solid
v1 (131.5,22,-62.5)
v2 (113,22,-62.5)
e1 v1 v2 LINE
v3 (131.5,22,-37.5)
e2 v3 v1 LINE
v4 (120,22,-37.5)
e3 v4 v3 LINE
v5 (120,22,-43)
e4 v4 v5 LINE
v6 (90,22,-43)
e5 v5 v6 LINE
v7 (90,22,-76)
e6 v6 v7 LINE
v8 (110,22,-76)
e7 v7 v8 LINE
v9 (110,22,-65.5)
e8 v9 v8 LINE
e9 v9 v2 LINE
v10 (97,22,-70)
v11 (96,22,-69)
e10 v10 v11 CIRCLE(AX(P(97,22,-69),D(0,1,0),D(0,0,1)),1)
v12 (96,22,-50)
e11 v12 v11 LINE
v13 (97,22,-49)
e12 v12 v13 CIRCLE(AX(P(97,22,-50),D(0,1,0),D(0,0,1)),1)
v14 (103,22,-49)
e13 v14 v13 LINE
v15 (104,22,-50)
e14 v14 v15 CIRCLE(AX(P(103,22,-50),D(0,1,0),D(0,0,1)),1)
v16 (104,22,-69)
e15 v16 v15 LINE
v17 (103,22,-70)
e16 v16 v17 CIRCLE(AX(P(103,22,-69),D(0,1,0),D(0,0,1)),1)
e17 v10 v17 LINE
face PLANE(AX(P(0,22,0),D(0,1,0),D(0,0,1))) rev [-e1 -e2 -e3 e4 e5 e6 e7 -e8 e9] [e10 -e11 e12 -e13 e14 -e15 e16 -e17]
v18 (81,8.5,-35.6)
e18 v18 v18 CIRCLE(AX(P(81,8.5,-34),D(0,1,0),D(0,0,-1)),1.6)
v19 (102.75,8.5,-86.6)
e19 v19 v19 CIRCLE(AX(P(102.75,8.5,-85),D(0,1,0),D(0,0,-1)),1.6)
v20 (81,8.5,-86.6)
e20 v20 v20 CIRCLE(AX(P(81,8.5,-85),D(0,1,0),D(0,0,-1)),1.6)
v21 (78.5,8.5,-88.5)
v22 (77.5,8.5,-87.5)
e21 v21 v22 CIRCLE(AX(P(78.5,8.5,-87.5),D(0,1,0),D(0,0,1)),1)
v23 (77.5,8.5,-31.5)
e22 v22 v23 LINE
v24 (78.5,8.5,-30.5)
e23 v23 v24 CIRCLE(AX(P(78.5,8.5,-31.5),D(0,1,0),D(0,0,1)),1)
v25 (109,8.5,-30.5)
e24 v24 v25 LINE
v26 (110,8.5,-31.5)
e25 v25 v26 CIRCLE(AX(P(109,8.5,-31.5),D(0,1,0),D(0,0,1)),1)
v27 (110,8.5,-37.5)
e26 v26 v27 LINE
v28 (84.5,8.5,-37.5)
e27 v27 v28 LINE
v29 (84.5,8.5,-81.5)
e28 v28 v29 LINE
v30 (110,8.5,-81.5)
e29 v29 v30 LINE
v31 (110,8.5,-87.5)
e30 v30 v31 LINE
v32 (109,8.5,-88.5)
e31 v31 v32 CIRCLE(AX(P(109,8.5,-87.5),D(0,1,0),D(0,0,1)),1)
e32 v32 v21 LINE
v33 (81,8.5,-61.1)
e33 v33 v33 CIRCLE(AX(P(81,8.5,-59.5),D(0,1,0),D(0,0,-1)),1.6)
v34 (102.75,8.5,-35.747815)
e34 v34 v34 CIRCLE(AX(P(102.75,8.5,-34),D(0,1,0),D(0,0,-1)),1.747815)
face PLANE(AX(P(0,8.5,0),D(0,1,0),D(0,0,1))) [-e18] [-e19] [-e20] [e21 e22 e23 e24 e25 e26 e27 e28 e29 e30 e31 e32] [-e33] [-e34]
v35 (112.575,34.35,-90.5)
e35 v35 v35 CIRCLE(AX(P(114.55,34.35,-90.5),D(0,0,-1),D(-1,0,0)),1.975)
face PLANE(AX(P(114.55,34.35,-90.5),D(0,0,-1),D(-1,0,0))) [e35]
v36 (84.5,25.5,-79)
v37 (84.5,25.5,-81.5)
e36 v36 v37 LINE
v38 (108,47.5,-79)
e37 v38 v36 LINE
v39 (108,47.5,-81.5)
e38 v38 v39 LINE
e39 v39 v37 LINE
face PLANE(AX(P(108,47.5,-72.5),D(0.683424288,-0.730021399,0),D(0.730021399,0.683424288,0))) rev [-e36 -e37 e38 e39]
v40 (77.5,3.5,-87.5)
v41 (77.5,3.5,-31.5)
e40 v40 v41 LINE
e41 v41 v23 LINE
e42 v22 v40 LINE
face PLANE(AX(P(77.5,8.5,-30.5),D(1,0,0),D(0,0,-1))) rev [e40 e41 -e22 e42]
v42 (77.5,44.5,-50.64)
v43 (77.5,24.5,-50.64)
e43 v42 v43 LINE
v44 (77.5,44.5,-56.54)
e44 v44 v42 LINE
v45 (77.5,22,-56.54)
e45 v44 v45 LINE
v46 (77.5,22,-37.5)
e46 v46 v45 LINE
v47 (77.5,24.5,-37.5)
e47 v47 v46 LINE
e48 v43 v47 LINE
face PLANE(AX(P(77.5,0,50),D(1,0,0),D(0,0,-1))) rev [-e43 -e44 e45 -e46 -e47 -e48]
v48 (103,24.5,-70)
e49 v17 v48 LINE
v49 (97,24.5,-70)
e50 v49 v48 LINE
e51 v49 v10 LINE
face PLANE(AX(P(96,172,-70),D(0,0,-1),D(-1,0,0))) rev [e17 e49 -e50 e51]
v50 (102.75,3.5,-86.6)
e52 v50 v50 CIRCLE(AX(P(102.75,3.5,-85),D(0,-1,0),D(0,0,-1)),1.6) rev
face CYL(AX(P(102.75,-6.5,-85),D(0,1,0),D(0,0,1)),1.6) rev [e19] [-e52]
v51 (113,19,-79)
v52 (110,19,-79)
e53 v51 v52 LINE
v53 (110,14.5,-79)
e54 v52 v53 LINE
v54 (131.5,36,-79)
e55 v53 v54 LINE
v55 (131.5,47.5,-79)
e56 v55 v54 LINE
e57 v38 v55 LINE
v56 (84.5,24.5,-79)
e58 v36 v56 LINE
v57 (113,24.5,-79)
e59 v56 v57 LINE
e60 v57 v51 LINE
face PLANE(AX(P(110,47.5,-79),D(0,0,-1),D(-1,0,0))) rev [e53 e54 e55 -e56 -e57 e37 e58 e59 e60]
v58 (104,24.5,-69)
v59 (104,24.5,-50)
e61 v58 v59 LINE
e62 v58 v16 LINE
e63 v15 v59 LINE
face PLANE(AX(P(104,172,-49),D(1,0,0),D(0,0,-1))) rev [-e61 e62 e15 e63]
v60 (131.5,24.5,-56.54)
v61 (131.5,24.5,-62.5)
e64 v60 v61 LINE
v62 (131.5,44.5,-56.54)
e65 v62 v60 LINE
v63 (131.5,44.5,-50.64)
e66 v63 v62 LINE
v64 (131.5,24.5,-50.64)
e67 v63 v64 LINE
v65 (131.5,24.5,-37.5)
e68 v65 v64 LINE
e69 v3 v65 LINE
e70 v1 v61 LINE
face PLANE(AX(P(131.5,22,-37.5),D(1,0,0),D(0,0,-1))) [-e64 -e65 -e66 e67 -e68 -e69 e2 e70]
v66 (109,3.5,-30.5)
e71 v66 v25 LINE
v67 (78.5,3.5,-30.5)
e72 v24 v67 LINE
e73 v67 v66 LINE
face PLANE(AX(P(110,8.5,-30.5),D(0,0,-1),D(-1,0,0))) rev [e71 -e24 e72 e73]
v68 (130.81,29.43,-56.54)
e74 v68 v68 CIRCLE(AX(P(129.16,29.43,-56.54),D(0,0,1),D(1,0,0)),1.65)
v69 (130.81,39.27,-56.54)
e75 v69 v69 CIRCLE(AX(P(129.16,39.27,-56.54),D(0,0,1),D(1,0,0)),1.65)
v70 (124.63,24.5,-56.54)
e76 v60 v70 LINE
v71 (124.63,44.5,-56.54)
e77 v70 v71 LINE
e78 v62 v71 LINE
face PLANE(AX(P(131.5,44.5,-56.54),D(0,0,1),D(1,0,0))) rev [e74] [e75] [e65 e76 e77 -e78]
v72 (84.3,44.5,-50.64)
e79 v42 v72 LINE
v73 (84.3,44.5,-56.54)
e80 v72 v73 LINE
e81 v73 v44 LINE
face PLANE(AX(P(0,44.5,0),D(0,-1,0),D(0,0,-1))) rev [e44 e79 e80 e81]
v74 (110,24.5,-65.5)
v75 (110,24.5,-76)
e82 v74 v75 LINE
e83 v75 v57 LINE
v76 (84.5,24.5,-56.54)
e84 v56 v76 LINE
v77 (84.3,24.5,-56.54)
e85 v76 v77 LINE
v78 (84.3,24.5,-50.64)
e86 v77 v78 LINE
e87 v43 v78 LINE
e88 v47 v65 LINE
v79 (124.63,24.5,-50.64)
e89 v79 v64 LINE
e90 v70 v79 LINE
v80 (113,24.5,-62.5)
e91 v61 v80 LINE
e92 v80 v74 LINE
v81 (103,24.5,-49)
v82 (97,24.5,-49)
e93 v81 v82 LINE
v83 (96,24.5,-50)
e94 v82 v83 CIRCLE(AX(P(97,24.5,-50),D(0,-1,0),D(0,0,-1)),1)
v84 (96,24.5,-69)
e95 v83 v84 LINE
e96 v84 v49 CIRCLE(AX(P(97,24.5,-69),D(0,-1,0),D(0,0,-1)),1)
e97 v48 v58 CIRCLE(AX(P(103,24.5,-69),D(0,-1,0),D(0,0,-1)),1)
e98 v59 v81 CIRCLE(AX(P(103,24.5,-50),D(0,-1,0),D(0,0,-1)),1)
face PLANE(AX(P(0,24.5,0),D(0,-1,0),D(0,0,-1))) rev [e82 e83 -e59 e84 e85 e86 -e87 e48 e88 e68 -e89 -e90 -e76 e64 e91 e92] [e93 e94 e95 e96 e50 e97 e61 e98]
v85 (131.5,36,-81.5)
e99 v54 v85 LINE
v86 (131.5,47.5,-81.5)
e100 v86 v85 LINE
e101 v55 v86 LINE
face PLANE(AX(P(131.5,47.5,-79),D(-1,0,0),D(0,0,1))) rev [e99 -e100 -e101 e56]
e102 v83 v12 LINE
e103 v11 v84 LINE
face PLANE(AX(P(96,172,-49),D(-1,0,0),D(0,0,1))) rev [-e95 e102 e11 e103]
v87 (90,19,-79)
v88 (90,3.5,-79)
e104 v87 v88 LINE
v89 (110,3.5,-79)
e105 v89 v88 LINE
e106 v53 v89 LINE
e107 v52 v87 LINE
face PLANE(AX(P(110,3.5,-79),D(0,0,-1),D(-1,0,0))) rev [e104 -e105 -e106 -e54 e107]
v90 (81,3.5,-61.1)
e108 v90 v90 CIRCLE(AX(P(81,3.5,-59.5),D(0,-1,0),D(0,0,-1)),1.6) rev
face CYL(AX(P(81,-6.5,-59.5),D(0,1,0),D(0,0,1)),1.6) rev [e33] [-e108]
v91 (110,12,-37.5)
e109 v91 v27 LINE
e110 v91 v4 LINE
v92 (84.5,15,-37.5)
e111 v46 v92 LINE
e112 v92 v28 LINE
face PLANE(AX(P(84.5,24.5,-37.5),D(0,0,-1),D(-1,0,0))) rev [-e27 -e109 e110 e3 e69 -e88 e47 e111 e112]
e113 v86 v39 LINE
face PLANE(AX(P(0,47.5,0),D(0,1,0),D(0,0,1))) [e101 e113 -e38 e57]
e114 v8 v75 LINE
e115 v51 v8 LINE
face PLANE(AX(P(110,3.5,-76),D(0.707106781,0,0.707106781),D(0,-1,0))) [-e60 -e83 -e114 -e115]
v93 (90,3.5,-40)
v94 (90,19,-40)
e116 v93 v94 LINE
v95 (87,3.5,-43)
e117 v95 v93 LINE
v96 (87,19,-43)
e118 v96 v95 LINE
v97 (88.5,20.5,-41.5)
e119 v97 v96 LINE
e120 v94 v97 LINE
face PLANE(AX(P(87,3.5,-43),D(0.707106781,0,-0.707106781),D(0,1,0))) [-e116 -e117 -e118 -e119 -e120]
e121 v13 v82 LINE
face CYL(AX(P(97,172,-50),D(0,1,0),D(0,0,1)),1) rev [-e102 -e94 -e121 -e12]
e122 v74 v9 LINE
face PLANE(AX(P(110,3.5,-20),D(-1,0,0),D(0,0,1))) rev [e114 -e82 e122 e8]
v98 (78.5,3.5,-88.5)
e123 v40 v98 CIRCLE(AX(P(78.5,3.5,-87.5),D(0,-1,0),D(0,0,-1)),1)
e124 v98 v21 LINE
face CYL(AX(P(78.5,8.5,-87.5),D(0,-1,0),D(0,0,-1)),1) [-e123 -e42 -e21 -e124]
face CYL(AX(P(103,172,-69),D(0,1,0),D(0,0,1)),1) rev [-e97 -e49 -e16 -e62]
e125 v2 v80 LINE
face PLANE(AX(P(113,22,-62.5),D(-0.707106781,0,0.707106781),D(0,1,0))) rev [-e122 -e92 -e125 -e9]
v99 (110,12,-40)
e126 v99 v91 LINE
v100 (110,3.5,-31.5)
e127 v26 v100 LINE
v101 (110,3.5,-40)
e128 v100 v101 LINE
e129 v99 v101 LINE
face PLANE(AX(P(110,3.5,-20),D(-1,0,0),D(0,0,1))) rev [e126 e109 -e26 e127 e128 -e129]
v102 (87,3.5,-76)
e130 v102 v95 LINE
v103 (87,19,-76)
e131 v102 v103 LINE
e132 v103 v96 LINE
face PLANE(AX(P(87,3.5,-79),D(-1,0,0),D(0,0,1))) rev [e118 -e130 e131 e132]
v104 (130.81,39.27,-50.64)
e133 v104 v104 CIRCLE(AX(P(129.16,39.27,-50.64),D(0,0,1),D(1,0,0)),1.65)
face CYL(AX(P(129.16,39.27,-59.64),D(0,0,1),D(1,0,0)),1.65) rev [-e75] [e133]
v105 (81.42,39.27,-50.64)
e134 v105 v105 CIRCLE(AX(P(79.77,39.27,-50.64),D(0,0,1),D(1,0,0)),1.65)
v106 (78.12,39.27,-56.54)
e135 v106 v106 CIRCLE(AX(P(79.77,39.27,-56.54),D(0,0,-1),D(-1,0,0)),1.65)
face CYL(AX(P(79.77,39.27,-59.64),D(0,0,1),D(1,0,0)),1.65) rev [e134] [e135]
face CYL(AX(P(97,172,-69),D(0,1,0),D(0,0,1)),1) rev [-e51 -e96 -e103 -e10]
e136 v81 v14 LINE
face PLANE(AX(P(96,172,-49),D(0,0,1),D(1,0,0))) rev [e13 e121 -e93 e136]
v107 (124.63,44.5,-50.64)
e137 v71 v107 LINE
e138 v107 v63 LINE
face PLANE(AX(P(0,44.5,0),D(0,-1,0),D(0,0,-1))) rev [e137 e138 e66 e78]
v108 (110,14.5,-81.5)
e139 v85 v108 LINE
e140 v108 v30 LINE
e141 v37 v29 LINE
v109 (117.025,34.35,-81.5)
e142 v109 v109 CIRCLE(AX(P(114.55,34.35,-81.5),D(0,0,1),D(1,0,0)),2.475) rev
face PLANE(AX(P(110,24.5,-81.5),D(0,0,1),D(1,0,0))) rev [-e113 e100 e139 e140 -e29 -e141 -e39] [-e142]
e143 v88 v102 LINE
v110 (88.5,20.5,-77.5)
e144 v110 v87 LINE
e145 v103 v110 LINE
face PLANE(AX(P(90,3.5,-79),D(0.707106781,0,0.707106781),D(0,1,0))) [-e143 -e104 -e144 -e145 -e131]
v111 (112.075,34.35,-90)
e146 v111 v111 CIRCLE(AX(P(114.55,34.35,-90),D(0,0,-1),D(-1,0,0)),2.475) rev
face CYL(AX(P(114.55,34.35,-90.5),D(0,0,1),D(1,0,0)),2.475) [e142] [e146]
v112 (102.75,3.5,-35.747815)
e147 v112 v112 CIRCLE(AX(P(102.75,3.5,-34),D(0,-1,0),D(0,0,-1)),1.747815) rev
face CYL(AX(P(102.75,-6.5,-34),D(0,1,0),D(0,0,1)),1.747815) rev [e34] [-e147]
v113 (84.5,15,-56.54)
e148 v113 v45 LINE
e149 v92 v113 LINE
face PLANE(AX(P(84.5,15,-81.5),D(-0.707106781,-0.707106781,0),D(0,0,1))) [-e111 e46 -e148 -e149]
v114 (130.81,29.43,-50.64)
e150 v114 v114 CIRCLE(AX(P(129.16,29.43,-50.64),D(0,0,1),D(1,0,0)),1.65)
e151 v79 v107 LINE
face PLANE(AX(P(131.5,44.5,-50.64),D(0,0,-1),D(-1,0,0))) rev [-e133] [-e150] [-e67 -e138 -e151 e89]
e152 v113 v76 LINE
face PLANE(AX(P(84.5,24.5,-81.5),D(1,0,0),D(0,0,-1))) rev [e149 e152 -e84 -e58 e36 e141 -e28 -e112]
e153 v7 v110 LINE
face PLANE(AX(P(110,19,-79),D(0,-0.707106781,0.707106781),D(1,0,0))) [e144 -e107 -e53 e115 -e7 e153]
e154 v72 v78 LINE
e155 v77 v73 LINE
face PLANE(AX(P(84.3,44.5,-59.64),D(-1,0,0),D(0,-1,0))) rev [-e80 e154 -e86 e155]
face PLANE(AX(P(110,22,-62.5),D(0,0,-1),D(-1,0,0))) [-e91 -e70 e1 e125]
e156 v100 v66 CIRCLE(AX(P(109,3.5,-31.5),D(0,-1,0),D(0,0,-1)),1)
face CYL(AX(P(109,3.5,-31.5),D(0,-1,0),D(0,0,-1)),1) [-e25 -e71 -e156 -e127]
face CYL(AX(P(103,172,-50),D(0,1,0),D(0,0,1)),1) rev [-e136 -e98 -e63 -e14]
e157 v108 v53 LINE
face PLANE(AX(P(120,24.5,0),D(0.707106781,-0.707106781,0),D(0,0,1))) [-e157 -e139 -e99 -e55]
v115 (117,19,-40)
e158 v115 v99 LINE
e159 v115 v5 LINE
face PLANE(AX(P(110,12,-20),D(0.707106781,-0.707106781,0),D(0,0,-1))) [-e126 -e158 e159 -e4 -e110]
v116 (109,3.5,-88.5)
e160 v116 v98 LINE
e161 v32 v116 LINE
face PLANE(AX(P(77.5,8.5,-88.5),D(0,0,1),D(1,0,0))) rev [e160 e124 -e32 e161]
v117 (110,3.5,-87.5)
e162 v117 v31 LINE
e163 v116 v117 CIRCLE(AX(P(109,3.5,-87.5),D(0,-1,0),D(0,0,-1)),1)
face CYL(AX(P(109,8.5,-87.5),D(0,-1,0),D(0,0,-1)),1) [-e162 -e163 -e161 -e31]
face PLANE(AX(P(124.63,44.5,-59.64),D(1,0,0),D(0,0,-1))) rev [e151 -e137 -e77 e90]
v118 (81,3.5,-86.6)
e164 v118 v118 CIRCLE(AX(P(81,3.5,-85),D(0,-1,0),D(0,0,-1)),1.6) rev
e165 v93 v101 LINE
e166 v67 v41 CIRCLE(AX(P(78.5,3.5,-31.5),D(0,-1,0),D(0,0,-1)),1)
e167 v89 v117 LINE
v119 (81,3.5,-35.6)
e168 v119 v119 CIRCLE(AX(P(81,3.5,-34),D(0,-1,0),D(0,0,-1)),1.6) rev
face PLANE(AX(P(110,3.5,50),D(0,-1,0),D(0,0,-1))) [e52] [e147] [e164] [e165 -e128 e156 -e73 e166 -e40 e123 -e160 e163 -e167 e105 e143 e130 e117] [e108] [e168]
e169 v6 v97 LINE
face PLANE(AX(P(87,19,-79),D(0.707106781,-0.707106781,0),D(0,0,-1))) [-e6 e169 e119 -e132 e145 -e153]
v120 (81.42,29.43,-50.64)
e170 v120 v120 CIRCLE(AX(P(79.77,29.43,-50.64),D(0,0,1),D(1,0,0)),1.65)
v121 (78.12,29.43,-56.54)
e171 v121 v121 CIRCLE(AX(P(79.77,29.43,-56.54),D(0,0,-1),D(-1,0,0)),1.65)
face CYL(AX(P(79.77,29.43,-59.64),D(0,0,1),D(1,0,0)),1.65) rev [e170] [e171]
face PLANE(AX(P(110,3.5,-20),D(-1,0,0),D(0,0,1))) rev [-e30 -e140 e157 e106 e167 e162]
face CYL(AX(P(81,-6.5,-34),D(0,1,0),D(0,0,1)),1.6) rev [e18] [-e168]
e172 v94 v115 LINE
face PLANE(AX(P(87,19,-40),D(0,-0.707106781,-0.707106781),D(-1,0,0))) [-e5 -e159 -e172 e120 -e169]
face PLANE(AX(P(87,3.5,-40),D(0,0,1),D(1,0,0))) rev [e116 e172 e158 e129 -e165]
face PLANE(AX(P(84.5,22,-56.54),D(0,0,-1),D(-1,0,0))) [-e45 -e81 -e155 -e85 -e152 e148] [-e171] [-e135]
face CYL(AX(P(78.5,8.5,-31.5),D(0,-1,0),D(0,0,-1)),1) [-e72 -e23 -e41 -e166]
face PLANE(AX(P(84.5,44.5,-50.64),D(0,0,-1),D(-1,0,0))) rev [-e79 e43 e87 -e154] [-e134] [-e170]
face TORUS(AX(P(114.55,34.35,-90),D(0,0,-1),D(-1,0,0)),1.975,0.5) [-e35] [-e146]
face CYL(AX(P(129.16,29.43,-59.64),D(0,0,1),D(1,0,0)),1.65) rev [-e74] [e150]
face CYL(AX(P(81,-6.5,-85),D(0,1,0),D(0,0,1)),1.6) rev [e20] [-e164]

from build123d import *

# Parameters (mm, degrees)
BOSS_EXTRUDE1_DEPTH = 3.5
BOSS_EXTRUDE2_DEPTH = 21
SKETCH3_W           = 23
SKETCH3_H           = 39
BOSS_EXTRUDE3_DEPTH = 2.5
SKETCH5_W           = 21.5
SKETCH5_H           = 25
SKETCH5_W_2         = 7.07
SKETCH5_H_2         = 19.04
BOSS_EXTRUDE5_DEPTH = 2.5
SKETCH6_W           = 7.07
SKETCH6_H           = 5.9
BOSS_EXTRUDE6_DEPTH = 20
BOSS_EXTRUDE7_DEPTH = 23
FILLET1_SIZE        = 10
SKETCH9_R           = 2.475
BOSS_EXTRUDE8_DEPTH = 9
FILLET2_R           = 0.5
SKETCH10_R          = 1.65
CUT_EXTRUDE1_DEPTH  = 9
SKETCH11_W          = 0.2
SKETCH11_H          = 20
CUT_EXTRUDE2_DEPTH  = 9
CUT_EXTRUDE3_DEPTH  = 9
FILLET3_SIZE        = 3
BOSS_EXTRUDE9_DEPTH = 5
SKETCH14_R          = 1.747814763
SKETCH14_R_2        = 1.6
CUT_EXTRUDE4_DEPTH  = 15
SKETCH15_W          = 110
SKETCH15_H          = 3.5
CUT_EXTRUDE5_DEPTH  = 150
FILLET4_SIZE        = 7
FILLET5_SIZE        = 3
FILLET6_SIZE        = 3
SKETCH17_W          = 8
SKETCH17_H          = 21
CUT_EXTRUDE6_DEPTH  = 150
FILLET7_R           = 1
FILLET8_R           = 1
FILLET9_SIZE        = 3


# Some blends are built 0.0001 mm under size
with BuildPart() as part:
    # Sketch1 → Boss-Extrude1 (new body)
    with BuildSketch(Plane(origin=(0, 0, 0), x_dir=(1, 0, 0), z_dir=(0, 1, 0))):
        Polygon((0, 40), (23, 40), (23, 79), (0, 79), (0, 100), (110, 100), (110, 79), (87, 79), (87, 40), (110, 40), (110, 20), (80, 0), (30, 0), (0, 20), align=None)
    extrude(amount=BOSS_EXTRUDE1_DEPTH)

    # Sketch2 → Boss-Extrude2 (add)
    with BuildSketch(Plane(origin=(0, 3.5, 0), x_dir=(1, 0, 0), z_dir=(0, 1, 0))):
        Polygon((0, 79), (23, 79), (23, 40), (0, 40), (0, 37.5), (25.5, 37.5), (25.5, 81.5), (0, 81.5), align=None)
        Polygon((110, 81.5), (84.5, 81.5), (84.5, 37.5), (110, 37.5), (110, 40), (87, 40), (87, 79), (110, 79), align=None)
    extrude(amount=BOSS_EXTRUDE2_DEPTH)

    # Sketch3 → Boss-Extrude3 (add)
    with BuildSketch(Plane(origin=(0, 24.5, 0), x_dir=(1, 0, 0), z_dir=(0, 1, 0))):
        with Locations((11.5, 59.5)):
            Rectangle(SKETCH3_W, SKETCH3_H)
        with Locations((98.5, 59.5)):
            Rectangle(SKETCH3_W, SKETCH3_H)
    extrude(amount=-BOSS_EXTRUDE3_DEPTH)

    # Sketch5 → Boss-Extrude5 (add)
    with BuildSketch(Plane(origin=(0, 24.5, 0), x_dir=(1, 0, 0), z_dir=(0, 1, 0))):
        with Locations((120.75, 50)):
            Rectangle(SKETCH5_W, SKETCH5_H)
        with Locations((-10.75, 50)):
            Rectangle(SKETCH5_W, SKETCH5_H)
        with Locations((29.035, 47.02)):
            Rectangle(SKETCH5_W_2, SKETCH5_H_2)
        with Locations((80.965, 47.02)):
            Rectangle(SKETCH5_W_2, SKETCH5_H_2)
    extrude(amount=-BOSS_EXTRUDE5_DEPTH)

    # Sketch6 → Boss-Extrude6 (add)
    with BuildSketch(Plane(origin=(0, 24.5, 0), x_dir=(1, 0, 0), z_dir=(0, 1, 0))):
        with Locations((29.035, 53.59)):
            Rectangle(SKETCH6_W, SKETCH6_H)
        with Locations((80.965, 53.59)):
            Rectangle(SKETCH6_W, SKETCH6_H)
        with Locations((-17.965, 53.59)):
            Rectangle(SKETCH6_W, SKETCH6_H)
        with Locations((127.965, 53.59)):
            Rectangle(SKETCH6_W, SKETCH6_H)
    extrude(amount=BOSS_EXTRUDE6_DEPTH)

    # Sketch7 → Boss-Extrude7 (add)
    with BuildSketch(Plane(origin=(0, 24.5, 0), x_dir=(1, 0, 0), z_dir=(0, 1, 0))):
        Polygon((0, 81.5), (25.5, 81.5), (25.5, 79), (0, 79), (-21.5, 79), (-21.5, 81.5), align=None)
        Polygon((110, 79), (84.5, 79), (84.5, 81.5), (110, 81.5), (131.5, 81.5), (131.5, 79), align=None)
    extrude(amount=BOSS_EXTRUDE7_DEPTH)

    # Fillet1
    # the kernel refuses this chamfer: 10 mm, written as the material it adds along each edge
    with BuildSketch(Plane(origin=(0, 22, -40), x_dir=(0.027495876610586372, -0.9996219169112968, 0), z_dir=(0, 0, 1)), Plane(origin=(110, 22, -37.5), x_dir=(-0.027495876610586317, -0.9996219169112968, 0), z_dir=(0, 0, -1)), Plane(origin=(110, 24.5, -81.5), x_dir=(0.9996219169112968, 0.027495876610586317, 0), z_dir=(0, 0, 1))) as fillet1_piece_1:
        Polygon((FILLET1_SIZE * 0.999621916911, -FILLET1_SIZE * 0.0274958766106), (-FILLET1_SIZE * 0.0274958766106, -FILLET1_SIZE * 0.999621916911), (0, 0), align=None)
    extrude(amount=2.5)
    with BuildSketch(Plane(origin=(0, 24.5, -79), x_dir=(0.027495876610586372, -0.9996219169112968, 0), z_dir=(0, 0, -1))) as fillet1_piece_2:
        Polygon((FILLET1_SIZE * 0.999621916911, FILLET1_SIZE * 0.0274958766106), (-FILLET1_SIZE * 0.0274958766106, FILLET1_SIZE * 0.999621916911), (0, 0), align=None)
    extrude(amount=2.5)

    # Sketch9 → Boss-Extrude8 (add)
    with BuildSketch(Plane(origin=(0, 0, -81.5), x_dir=(-1, 0, 0), z_dir=(0, 0, -1))):
        with Locations(Location((-114.55, 34.35, 0), (0, 0, 180))):
            Circle(SKETCH9_R)
        with Locations(Location((4.55, 34.35, 0), (0, 0, 180))):
            Circle(SKETCH9_R)
    extrude(amount=BOSS_EXTRUDE8_DEPTH)

    # Fillet2
    fillet2_edges = [part.edges().sort_by_distance(p)[0] for p in [
        (112.075, 34.35, -90.5),
        (-7.025, 34.35, -90.5),
    ]]
    fillet(fillet2_edges, radius=FILLET2_R)

    # Sketch10 → Cut-Extrude1 (cut)
    with BuildSketch(Plane.XY.offset(-50.64)):
        with Locations((129.16, 39.27)):
            Circle(SKETCH10_R)
        with Locations((129.16, 29.43)):
            Circle(SKETCH10_R)
        with Locations((79.77, 39.27)):
            Circle(SKETCH10_R)
        with Locations((79.77, 29.43)):
            Circle(SKETCH10_R)
        with Locations((-19.16, 29.43)):
            Circle(SKETCH10_R)
        with Locations((-19.16, 39.27)):
            Circle(SKETCH10_R)
        with Locations(Location((30.23, 39.27, 0), (0, 0, 180))):
            Circle(SKETCH10_R)
        with Locations(Location((30.23, 29.43, 0), (0, 0, 180))):
            Circle(SKETCH10_R)
    extrude(amount=-CUT_EXTRUDE1_DEPTH, mode=Mode.SUBTRACT)

    # Sketch11 → Cut-Extrude2 (cut)
    with BuildSketch(Plane.XY.offset(-50.64)):
        with Locations((-14.53, 34.5)):
            Rectangle(SKETCH11_W, SKETCH11_H)
        with Locations((25.6, 34.5)):
            Rectangle(SKETCH11_W, SKETCH11_H)
        with Locations((84.4, 34.5)):
            Rectangle(SKETCH11_W, SKETCH11_H)
        with Locations((124.53, 34.5)):
            Rectangle(SKETCH11_W, SKETCH11_H)
    extrude(amount=-CUT_EXTRUDE2_DEPTH, mode=Mode.SUBTRACT)

    # Sketch12 → Cut-Extrude3 (cut)
    with BuildSketch(Plane(origin=(0, 0, -81.5), x_dir=(-1, 0, 0), z_dir=(0, 0, -1))):
        Polygon((-108, 47.5), (-84.5, 25.5), (-84.5, 47.5), align=None)
        Polygon((-25.5, 25.5), (-25.5, 47.5), (-2, 47.5), align=None)
        Polygon((-120, 24.5), (-131.5, 36), (-131.5, 24.5), align=None)
        Polygon((10, 24.5), (21.5, 36), (21.5, 24.5), align=None)
    extrude(amount=-CUT_EXTRUDE3_DEPTH, mode=Mode.SUBTRACT)

    # Fillet3
    fillet3_edges = [part.edges().sort_by_distance(p)[0] for p in [
        (0, 23.25, -62.5),
        (110, 23.25, -62.5),
    ]]
    chamfer(fillet3_edges, length=FILLET3_SIZE)

    # Sketch13 → Boss-Extrude9 (add)
    with BuildSketch(Plane(origin=(0, 3.5, 0), x_dir=(1, 0, 0), z_dir=(0, 1, 0))):
        Polygon((0, 30.5), (32.5, 30.5), (32.5, 88.5), (0, 88.5), (0, 81.5), (25.5, 81.5), (25.5, 37.5), (0, 37.5), align=None)
        Polygon((84.5, 37.5), (110, 37.5), (110, 30.5), (77.5, 30.5), (77.5, 88.5), (110, 88.5), (110, 81.5), (84.5, 81.5), align=None)
    extrude(amount=BOSS_EXTRUDE9_DEPTH)

    # Sketch14 → Cut-Extrude4 (cut)
    with BuildSketch(Plane(origin=(0, 8.5, 0), x_dir=(1, 0, 0), z_dir=(0, 1, 0))):
        with Locations(Location((7.25, 34, 0), (0, 0, 270))):
            Circle(SKETCH14_R)
        with Locations(Location((7.25, 85, 0), (0, 0, 270))):
            Circle(SKETCH14_R_2)
        with Locations(Location((29, 34, 0), (0, 0, 270))):
            Circle(SKETCH14_R_2)
        with Locations(Location((29, 59.5, 0), (0, 0, 270))):
            Circle(SKETCH14_R_2)
        with Locations(Location((29, 85, 0), (0, 0, 270))):
            Circle(SKETCH14_R_2)
        with Locations(Location((81, 34, 0), (0, 0, 90))):
            Circle(SKETCH14_R_2)
        with Locations(Location((102.75, 34, 0), (0, 0, 90))):
            Circle(SKETCH14_R)
        with Locations(Location((81, 59.5, 0), (0, 0, 90))):
            Circle(SKETCH14_R_2)
        with Locations(Location((81, 85, 0), (0, 0, 90))):
            Circle(SKETCH14_R_2)
        with Locations(Location((102.75, 85, 0), (0, 0, 90))):
            Circle(SKETCH14_R_2)
    extrude(amount=-CUT_EXTRUDE4_DEPTH, mode=Mode.SUBTRACT)

    # Sketch15 → Cut-Extrude5 (cut)
    with BuildSketch(Plane(origin=(0, 0, -100), x_dir=(-1, 0, 0), z_dir=(0, 0, -1))):
        Polygon((-77.5, 47.5), (-77.5, 3.5), (0, 3.5), (21.5, 3.5), (21.5, 47.5), align=None)
        with Locations((-55, 1.75)):
            Rectangle(SKETCH15_W, SKETCH15_H)
    extrude(amount=-CUT_EXTRUDE5_DEPTH, mode=Mode.SUBTRACT)

    # Fillet4
    fillet4_edges = [part.edges().sort_by_distance(p)[0] for p in [
        (84.5, 22, -47.02),
    ]]
    chamfer(fillet4_edges, length=FILLET4_SIZE - 0.0001)  # a hair under: the kernel refuses the full size

    # Fillet5
    fillet5_edges = [part.edges().sort_by_distance(p)[0] for p in [
        (87, 22, -59.5),
        (98.5, 22, -79),
        (103.5, 22, -40),
    ]]
    chamfer(fillet5_edges, length=FILLET5_SIZE)

    # Fillet6
    fillet6_edges = [part.edges().sort_by_distance(p)[0] for p in [
        (110, 21.75, -79),
    ]]
    chamfer(fillet6_edges, length=FILLET6_SIZE)

    # Sketch17 → Cut-Extrude6 (cut)
    with BuildSketch(Plane.XZ.offset(-22)):
        with Locations((100, -59.5)):
            Rectangle(SKETCH17_W, SKETCH17_H)
    extrude(amount=-CUT_EXTRUDE6_DEPTH, mode=Mode.SUBTRACT)

    # Fillet7
    fillet7_edges = [part.edges().sort_by_distance(p)[0] for p in [
        (96, 23.25, -70),
        (96, 23.25, -49),
        (104, 23.25, -49),
        (104, 23.25, -70),
    ]]
    fillet(fillet7_edges, radius=FILLET7_R)

    # Fillet8
    fillet8_edges = [part.edges().sort_by_distance(p)[0] for p in [
        (110, 6, -88.5),
        (77.5, 6, -88.5),
        (77.5, 6, -30.5),
        (110, 6, -30.5),
    ]]
    fillet(fillet8_edges, radius=FILLET8_R)

    # Fillet9
    fillet9_edges = [part.edges().sort_by_distance(p)[0] for p in [
        (87, 11.25, -79),
        (87, 11.25, -40),
    ]]
    chamfer(fillet9_edges, length=FILLET9_SIZE)


solid = part.part
